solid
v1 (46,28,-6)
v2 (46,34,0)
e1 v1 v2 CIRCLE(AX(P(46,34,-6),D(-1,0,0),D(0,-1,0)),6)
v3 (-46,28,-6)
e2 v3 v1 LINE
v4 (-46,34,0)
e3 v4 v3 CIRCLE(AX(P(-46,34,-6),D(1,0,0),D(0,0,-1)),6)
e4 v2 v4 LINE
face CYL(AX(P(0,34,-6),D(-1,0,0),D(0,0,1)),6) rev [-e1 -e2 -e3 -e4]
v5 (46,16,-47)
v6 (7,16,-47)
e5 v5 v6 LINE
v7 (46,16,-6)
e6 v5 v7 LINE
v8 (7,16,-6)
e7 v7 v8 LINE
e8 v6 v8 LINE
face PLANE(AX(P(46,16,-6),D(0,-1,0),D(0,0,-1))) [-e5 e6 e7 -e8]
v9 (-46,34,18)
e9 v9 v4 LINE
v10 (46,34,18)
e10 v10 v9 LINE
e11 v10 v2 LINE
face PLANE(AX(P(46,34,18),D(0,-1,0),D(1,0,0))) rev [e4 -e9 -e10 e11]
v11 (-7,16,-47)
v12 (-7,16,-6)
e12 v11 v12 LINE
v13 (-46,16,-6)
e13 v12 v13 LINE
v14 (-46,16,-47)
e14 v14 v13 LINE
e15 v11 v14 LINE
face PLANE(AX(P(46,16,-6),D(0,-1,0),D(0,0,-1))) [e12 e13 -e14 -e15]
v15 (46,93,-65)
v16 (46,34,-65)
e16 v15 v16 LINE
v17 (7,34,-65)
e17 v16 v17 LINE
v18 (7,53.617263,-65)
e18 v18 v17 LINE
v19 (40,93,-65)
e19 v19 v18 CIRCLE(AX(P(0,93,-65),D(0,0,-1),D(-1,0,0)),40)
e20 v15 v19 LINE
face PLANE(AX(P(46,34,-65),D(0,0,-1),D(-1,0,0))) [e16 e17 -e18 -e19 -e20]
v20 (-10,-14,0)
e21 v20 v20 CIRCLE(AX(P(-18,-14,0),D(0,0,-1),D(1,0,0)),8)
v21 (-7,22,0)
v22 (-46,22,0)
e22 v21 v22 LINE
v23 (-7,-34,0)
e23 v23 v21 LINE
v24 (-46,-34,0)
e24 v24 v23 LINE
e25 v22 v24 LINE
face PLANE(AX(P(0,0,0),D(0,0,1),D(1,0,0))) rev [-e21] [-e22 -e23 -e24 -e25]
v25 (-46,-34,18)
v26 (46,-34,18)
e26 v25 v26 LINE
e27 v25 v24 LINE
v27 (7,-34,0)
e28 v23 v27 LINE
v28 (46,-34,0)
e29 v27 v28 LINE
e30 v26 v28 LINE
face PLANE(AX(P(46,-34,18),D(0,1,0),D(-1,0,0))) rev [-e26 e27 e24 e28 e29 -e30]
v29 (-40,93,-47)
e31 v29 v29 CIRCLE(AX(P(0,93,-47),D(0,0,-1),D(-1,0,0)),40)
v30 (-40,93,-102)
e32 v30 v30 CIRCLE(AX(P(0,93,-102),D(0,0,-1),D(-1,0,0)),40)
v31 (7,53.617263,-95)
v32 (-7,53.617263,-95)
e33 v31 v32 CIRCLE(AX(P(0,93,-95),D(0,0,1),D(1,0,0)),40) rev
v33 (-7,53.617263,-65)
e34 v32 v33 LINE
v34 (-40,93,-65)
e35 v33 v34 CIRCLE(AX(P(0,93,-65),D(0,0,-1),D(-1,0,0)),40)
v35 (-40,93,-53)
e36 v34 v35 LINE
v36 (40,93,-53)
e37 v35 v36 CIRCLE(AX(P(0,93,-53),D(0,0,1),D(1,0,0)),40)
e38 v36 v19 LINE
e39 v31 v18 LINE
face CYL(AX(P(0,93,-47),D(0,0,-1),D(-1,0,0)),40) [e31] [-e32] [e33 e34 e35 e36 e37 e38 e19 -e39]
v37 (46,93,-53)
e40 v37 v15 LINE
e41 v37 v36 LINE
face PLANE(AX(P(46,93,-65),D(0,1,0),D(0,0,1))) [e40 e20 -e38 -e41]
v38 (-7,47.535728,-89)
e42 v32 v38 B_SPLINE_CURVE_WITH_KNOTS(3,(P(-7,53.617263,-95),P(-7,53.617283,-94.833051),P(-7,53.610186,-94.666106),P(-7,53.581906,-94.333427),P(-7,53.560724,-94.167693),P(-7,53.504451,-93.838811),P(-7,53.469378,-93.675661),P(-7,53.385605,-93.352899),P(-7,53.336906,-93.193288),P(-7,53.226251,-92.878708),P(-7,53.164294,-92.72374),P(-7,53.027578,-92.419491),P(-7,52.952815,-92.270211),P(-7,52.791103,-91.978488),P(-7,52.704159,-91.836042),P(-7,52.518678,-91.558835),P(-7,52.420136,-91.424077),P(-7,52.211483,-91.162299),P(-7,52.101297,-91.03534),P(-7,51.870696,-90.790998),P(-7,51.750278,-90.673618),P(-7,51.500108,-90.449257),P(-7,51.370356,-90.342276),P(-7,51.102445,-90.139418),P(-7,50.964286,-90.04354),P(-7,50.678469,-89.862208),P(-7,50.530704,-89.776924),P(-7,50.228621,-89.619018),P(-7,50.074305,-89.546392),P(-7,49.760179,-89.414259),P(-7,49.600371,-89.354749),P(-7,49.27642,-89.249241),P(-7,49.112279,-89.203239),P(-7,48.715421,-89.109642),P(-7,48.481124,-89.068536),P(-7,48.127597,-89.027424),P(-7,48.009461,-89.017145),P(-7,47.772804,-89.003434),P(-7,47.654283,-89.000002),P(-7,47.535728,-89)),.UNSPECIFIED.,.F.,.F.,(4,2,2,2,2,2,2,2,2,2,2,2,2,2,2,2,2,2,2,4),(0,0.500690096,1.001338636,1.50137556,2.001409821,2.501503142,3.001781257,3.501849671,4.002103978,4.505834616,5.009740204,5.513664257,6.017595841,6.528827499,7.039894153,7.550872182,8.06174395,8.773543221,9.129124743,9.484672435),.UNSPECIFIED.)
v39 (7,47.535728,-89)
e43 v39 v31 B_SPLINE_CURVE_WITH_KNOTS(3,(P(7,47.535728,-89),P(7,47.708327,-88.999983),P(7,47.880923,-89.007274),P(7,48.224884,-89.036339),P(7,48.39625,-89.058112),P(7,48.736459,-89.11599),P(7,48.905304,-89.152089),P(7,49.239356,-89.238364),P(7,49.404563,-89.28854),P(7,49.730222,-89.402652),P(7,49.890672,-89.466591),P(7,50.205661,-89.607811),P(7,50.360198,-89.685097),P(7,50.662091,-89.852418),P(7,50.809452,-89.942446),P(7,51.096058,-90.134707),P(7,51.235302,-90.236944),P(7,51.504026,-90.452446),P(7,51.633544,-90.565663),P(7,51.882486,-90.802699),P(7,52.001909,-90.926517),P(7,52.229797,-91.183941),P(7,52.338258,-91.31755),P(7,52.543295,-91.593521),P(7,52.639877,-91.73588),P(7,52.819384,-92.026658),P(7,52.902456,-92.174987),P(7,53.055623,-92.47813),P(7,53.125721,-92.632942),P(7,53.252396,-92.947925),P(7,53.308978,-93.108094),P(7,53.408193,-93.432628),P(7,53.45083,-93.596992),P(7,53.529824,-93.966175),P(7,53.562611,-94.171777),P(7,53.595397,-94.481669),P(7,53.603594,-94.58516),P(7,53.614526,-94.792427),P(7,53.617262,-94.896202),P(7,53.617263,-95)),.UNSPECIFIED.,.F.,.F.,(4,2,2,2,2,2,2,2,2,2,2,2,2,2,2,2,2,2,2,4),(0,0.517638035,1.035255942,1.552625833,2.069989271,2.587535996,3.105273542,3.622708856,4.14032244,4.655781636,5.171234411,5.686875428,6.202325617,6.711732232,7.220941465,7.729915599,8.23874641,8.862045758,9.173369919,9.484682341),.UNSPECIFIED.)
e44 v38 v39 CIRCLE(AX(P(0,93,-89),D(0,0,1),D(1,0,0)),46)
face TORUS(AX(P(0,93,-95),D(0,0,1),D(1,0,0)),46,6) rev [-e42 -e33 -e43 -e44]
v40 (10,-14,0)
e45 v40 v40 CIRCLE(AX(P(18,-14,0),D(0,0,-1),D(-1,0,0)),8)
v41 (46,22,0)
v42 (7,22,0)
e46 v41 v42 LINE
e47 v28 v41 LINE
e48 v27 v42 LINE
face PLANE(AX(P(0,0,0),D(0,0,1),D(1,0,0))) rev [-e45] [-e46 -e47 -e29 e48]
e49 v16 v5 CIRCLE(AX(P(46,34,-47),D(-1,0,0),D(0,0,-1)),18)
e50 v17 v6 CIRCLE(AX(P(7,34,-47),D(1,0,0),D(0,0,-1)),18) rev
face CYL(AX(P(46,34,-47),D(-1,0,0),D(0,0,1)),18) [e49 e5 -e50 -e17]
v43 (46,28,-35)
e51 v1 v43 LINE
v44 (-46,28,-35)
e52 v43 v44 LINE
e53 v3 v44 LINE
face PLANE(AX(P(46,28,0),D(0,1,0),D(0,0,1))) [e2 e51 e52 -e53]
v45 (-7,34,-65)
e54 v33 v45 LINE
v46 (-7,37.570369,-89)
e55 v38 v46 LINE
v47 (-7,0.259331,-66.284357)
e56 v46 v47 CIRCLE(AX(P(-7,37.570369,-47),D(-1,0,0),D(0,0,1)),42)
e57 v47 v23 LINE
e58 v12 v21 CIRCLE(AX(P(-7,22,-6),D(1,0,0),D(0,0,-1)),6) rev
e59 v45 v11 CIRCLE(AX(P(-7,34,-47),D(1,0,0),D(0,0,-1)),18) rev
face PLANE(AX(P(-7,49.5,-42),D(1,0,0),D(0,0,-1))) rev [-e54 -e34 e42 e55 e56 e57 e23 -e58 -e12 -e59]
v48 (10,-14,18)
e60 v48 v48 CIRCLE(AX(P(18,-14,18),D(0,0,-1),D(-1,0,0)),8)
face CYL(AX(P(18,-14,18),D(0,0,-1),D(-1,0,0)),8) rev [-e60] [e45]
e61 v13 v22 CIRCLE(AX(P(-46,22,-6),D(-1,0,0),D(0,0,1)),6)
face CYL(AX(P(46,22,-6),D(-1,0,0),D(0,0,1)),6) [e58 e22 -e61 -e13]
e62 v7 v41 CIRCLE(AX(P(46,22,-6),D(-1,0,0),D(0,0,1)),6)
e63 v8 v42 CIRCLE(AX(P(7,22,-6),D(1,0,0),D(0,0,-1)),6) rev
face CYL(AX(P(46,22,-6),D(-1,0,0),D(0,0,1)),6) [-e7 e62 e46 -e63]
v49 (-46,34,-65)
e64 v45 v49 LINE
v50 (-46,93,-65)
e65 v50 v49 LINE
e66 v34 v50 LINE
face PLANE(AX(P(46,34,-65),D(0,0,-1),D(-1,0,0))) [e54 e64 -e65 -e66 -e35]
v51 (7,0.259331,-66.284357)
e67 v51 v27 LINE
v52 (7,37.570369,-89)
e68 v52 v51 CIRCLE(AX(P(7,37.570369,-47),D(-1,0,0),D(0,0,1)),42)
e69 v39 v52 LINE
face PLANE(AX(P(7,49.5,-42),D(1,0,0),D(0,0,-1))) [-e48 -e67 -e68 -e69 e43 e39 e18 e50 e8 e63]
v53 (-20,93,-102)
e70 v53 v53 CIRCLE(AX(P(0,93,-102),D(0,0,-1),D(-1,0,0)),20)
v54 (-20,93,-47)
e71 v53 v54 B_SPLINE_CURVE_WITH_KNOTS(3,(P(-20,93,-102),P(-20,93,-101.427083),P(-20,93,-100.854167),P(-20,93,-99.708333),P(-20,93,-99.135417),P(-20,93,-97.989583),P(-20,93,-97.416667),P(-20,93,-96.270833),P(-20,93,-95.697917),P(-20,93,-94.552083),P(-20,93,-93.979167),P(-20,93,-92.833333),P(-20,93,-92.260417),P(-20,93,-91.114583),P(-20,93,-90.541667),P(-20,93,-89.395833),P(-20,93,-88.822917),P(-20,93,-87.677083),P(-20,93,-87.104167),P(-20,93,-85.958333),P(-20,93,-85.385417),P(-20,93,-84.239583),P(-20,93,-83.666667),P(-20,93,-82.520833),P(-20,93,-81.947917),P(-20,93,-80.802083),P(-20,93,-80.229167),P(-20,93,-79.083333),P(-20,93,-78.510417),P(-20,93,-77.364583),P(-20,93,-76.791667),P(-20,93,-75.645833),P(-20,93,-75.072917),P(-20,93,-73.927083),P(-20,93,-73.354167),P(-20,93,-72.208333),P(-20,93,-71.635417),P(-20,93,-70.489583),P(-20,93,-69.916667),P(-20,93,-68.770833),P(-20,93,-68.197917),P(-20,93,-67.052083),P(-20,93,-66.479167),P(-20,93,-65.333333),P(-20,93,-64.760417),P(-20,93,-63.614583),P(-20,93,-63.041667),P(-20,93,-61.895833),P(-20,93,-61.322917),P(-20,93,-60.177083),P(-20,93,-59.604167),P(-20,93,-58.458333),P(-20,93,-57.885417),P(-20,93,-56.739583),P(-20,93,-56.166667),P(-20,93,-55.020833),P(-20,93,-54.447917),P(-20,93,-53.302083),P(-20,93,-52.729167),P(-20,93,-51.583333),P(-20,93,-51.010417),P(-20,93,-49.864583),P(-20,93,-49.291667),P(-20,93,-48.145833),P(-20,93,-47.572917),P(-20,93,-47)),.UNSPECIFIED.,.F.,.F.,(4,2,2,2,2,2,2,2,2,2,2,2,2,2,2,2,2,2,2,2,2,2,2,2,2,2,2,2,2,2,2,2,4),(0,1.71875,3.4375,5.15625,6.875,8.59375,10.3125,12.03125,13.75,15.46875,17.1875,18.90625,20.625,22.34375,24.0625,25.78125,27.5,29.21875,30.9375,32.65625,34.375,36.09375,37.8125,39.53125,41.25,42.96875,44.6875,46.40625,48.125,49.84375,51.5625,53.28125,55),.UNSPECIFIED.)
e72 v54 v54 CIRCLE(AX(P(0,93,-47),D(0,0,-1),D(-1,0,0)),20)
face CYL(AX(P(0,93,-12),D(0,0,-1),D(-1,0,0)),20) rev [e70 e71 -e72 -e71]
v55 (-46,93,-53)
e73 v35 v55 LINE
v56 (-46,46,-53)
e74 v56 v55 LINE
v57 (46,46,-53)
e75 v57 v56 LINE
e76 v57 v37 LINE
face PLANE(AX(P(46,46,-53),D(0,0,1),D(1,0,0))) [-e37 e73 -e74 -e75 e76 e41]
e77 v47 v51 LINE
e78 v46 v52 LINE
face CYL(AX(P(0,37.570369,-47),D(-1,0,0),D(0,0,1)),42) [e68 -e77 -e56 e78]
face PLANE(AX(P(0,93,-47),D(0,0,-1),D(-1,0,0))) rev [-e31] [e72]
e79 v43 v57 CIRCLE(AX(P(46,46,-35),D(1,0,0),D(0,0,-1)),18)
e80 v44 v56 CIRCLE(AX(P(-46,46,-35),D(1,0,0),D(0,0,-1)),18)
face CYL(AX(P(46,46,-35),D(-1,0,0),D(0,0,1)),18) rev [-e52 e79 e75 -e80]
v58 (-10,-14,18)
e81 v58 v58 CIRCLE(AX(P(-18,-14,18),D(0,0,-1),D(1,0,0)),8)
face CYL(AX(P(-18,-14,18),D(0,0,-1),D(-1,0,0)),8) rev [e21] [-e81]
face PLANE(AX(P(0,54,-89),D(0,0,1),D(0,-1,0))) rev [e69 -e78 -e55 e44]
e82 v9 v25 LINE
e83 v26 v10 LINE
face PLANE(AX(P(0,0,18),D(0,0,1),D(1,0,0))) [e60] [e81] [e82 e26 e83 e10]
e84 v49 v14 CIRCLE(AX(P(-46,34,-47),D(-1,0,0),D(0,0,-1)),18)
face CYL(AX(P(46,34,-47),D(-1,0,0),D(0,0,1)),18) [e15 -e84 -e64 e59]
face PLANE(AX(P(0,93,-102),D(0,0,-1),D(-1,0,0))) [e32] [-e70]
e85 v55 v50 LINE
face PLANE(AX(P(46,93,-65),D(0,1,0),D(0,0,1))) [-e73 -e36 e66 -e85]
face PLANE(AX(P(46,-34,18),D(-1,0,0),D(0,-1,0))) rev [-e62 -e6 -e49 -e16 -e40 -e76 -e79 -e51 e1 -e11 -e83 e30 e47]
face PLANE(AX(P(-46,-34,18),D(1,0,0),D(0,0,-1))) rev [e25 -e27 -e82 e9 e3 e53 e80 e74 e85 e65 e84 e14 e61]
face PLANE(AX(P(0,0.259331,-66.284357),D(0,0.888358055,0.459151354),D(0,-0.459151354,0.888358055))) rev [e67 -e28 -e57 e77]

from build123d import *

# Parameters (mm, degrees)
SKETCH1_W                = 92
SKETCH1_H                = 68
BOSS_EXTRUDE1_DEPTH      = 18
SKETCH2_R                = 8
CUT_EXTRUDE4_DEPTH       = 18
BOSS_EXTRUDE3_DEPTH      = 92
FILLET2_R                = 6
BOSS_EXTRUDE4_DEPTH      = 37
BOSS_EXTRUDE4_DEPTH_BACK = 18
SKETCH9_R                = 40
SKETCH10_R               = 20
CUT_EXTRUDE6_DEPTH       = 90
RIB6_START               = -7
RIB6_DEPTH               = 14
FILLET3_R                = 6


# Read off the part's stored shape, not the designer's step: Rib6
with BuildPart() as part:
    # Sketch1 → Boss-Extrude1 (new body)
    with BuildSketch(Plane.XY):
        Rectangle(SKETCH1_W, SKETCH1_H)
    extrude(amount=BOSS_EXTRUDE1_DEPTH)

    # Sketch2 → Cut-Extrude4 (cut)
    with BuildSketch(Plane(origin=(0, 0, 0), x_dir=(-1, 0, 0), z_dir=(0, 0, -1))):
        with Locations((-18, -14)):
            Circle(SKETCH2_R)
        with Locations(Location((18, -14, 0), (0, 0, 180))):
            Circle(SKETCH2_R)
    extrude(amount=-CUT_EXTRUDE4_DEPTH, mode=Mode.SUBTRACT)

    # Sketch7 → Boss-Extrude3 (add)
    with BuildSketch(Plane.ZY.offset(46)):
        with BuildLine():
            Line((0, 28), (-35, 28))
            ThreePointArc((-35, 28), (-47.727922061, 33.272077939), (-53, 46))
            Line((-53, 46), (-53, 93))
            Line((-53, 93), (-65, 93))
            Line((-65, 93), (-65, 34))
            ThreePointArc((-65, 34), (-59.727922061, 21.272077939), (-47, 16))
            Line((-47, 16), (-6, 16))
            ThreePointArc((-6, 16), (-1.757359313, 17.757359313), (0, 22))
            Line((0, 22), (0, 28))
        make_face()
    extrude(amount=-BOSS_EXTRUDE3_DEPTH)

    # Fillet2
    fillet2_edges = [part.edges().sort_by_distance(p)[0] for p in [
        (0, 28, 0),
    ]]
    fillet(fillet2_edges, radius=FILLET2_R - 0.0001)  # a hair under: the kernel refuses the full size

    # Sketch9 → Boss-Extrude4 (add, two sides: drawn at the far end of the back side and taken through both)
    with BuildSketch(Plane(origin=(0, 0, -65), x_dir=(-1, 0, 0), z_dir=(0, 0, -1)).offset(-BOSS_EXTRUDE4_DEPTH_BACK)):
        with Locations((0, 93)):
            Circle(SKETCH9_R)
    extrude(amount=BOSS_EXTRUDE4_DEPTH + BOSS_EXTRUDE4_DEPTH_BACK)

    # Sketch10 → Cut-Extrude6 (cut)
    with BuildSketch(Plane(origin=(0, 0, -102), x_dir=(-1, 0, 0), z_dir=(0, 0, -1))):
        with Locations((0, 93)):
            Circle(SKETCH10_R)
    extrude(amount=-CUT_EXTRUDE6_DEPTH, mode=Mode.SUBTRACT)

    # Rib6 outline → Rib6 (add)
    with BuildSketch(Plane(origin=(0, 0, 0), x_dir=(0, 0, -1), z_dir=(1, 0, 0)).offset(RIB6_START)):
        with BuildLine():
            Line((89, 54), (65, 54))
            Line((65, 54), (65, 34))
            ThreePointArc((65, 34), (59.727922061, 21.272077939), (47, 16))
            Line((47, 16), (6, 16))
            ThreePointArc((6, 16), (1.757359313, 17.757359313), (0, 22))
            Line((0, 22), (0, -34))
            Line((0, -34), (66.284356879, 0.259330522))
            ThreePointArc((66.284356879, 0.259330522), (82.874384935, 15.729386584), (89, 37.570368832))
            Line((89, 37.570368832), (89, 54))
        make_face()
    extrude(amount=RIB6_DEPTH)

    # Fillet3
    fillet3_edges = [part.edges().sort_by_distance(p)[0] for p in [
        (0, 53, -89),
    ]]
    fillet(fillet3_edges, radius=FILLET3_R)


solid = part.part
